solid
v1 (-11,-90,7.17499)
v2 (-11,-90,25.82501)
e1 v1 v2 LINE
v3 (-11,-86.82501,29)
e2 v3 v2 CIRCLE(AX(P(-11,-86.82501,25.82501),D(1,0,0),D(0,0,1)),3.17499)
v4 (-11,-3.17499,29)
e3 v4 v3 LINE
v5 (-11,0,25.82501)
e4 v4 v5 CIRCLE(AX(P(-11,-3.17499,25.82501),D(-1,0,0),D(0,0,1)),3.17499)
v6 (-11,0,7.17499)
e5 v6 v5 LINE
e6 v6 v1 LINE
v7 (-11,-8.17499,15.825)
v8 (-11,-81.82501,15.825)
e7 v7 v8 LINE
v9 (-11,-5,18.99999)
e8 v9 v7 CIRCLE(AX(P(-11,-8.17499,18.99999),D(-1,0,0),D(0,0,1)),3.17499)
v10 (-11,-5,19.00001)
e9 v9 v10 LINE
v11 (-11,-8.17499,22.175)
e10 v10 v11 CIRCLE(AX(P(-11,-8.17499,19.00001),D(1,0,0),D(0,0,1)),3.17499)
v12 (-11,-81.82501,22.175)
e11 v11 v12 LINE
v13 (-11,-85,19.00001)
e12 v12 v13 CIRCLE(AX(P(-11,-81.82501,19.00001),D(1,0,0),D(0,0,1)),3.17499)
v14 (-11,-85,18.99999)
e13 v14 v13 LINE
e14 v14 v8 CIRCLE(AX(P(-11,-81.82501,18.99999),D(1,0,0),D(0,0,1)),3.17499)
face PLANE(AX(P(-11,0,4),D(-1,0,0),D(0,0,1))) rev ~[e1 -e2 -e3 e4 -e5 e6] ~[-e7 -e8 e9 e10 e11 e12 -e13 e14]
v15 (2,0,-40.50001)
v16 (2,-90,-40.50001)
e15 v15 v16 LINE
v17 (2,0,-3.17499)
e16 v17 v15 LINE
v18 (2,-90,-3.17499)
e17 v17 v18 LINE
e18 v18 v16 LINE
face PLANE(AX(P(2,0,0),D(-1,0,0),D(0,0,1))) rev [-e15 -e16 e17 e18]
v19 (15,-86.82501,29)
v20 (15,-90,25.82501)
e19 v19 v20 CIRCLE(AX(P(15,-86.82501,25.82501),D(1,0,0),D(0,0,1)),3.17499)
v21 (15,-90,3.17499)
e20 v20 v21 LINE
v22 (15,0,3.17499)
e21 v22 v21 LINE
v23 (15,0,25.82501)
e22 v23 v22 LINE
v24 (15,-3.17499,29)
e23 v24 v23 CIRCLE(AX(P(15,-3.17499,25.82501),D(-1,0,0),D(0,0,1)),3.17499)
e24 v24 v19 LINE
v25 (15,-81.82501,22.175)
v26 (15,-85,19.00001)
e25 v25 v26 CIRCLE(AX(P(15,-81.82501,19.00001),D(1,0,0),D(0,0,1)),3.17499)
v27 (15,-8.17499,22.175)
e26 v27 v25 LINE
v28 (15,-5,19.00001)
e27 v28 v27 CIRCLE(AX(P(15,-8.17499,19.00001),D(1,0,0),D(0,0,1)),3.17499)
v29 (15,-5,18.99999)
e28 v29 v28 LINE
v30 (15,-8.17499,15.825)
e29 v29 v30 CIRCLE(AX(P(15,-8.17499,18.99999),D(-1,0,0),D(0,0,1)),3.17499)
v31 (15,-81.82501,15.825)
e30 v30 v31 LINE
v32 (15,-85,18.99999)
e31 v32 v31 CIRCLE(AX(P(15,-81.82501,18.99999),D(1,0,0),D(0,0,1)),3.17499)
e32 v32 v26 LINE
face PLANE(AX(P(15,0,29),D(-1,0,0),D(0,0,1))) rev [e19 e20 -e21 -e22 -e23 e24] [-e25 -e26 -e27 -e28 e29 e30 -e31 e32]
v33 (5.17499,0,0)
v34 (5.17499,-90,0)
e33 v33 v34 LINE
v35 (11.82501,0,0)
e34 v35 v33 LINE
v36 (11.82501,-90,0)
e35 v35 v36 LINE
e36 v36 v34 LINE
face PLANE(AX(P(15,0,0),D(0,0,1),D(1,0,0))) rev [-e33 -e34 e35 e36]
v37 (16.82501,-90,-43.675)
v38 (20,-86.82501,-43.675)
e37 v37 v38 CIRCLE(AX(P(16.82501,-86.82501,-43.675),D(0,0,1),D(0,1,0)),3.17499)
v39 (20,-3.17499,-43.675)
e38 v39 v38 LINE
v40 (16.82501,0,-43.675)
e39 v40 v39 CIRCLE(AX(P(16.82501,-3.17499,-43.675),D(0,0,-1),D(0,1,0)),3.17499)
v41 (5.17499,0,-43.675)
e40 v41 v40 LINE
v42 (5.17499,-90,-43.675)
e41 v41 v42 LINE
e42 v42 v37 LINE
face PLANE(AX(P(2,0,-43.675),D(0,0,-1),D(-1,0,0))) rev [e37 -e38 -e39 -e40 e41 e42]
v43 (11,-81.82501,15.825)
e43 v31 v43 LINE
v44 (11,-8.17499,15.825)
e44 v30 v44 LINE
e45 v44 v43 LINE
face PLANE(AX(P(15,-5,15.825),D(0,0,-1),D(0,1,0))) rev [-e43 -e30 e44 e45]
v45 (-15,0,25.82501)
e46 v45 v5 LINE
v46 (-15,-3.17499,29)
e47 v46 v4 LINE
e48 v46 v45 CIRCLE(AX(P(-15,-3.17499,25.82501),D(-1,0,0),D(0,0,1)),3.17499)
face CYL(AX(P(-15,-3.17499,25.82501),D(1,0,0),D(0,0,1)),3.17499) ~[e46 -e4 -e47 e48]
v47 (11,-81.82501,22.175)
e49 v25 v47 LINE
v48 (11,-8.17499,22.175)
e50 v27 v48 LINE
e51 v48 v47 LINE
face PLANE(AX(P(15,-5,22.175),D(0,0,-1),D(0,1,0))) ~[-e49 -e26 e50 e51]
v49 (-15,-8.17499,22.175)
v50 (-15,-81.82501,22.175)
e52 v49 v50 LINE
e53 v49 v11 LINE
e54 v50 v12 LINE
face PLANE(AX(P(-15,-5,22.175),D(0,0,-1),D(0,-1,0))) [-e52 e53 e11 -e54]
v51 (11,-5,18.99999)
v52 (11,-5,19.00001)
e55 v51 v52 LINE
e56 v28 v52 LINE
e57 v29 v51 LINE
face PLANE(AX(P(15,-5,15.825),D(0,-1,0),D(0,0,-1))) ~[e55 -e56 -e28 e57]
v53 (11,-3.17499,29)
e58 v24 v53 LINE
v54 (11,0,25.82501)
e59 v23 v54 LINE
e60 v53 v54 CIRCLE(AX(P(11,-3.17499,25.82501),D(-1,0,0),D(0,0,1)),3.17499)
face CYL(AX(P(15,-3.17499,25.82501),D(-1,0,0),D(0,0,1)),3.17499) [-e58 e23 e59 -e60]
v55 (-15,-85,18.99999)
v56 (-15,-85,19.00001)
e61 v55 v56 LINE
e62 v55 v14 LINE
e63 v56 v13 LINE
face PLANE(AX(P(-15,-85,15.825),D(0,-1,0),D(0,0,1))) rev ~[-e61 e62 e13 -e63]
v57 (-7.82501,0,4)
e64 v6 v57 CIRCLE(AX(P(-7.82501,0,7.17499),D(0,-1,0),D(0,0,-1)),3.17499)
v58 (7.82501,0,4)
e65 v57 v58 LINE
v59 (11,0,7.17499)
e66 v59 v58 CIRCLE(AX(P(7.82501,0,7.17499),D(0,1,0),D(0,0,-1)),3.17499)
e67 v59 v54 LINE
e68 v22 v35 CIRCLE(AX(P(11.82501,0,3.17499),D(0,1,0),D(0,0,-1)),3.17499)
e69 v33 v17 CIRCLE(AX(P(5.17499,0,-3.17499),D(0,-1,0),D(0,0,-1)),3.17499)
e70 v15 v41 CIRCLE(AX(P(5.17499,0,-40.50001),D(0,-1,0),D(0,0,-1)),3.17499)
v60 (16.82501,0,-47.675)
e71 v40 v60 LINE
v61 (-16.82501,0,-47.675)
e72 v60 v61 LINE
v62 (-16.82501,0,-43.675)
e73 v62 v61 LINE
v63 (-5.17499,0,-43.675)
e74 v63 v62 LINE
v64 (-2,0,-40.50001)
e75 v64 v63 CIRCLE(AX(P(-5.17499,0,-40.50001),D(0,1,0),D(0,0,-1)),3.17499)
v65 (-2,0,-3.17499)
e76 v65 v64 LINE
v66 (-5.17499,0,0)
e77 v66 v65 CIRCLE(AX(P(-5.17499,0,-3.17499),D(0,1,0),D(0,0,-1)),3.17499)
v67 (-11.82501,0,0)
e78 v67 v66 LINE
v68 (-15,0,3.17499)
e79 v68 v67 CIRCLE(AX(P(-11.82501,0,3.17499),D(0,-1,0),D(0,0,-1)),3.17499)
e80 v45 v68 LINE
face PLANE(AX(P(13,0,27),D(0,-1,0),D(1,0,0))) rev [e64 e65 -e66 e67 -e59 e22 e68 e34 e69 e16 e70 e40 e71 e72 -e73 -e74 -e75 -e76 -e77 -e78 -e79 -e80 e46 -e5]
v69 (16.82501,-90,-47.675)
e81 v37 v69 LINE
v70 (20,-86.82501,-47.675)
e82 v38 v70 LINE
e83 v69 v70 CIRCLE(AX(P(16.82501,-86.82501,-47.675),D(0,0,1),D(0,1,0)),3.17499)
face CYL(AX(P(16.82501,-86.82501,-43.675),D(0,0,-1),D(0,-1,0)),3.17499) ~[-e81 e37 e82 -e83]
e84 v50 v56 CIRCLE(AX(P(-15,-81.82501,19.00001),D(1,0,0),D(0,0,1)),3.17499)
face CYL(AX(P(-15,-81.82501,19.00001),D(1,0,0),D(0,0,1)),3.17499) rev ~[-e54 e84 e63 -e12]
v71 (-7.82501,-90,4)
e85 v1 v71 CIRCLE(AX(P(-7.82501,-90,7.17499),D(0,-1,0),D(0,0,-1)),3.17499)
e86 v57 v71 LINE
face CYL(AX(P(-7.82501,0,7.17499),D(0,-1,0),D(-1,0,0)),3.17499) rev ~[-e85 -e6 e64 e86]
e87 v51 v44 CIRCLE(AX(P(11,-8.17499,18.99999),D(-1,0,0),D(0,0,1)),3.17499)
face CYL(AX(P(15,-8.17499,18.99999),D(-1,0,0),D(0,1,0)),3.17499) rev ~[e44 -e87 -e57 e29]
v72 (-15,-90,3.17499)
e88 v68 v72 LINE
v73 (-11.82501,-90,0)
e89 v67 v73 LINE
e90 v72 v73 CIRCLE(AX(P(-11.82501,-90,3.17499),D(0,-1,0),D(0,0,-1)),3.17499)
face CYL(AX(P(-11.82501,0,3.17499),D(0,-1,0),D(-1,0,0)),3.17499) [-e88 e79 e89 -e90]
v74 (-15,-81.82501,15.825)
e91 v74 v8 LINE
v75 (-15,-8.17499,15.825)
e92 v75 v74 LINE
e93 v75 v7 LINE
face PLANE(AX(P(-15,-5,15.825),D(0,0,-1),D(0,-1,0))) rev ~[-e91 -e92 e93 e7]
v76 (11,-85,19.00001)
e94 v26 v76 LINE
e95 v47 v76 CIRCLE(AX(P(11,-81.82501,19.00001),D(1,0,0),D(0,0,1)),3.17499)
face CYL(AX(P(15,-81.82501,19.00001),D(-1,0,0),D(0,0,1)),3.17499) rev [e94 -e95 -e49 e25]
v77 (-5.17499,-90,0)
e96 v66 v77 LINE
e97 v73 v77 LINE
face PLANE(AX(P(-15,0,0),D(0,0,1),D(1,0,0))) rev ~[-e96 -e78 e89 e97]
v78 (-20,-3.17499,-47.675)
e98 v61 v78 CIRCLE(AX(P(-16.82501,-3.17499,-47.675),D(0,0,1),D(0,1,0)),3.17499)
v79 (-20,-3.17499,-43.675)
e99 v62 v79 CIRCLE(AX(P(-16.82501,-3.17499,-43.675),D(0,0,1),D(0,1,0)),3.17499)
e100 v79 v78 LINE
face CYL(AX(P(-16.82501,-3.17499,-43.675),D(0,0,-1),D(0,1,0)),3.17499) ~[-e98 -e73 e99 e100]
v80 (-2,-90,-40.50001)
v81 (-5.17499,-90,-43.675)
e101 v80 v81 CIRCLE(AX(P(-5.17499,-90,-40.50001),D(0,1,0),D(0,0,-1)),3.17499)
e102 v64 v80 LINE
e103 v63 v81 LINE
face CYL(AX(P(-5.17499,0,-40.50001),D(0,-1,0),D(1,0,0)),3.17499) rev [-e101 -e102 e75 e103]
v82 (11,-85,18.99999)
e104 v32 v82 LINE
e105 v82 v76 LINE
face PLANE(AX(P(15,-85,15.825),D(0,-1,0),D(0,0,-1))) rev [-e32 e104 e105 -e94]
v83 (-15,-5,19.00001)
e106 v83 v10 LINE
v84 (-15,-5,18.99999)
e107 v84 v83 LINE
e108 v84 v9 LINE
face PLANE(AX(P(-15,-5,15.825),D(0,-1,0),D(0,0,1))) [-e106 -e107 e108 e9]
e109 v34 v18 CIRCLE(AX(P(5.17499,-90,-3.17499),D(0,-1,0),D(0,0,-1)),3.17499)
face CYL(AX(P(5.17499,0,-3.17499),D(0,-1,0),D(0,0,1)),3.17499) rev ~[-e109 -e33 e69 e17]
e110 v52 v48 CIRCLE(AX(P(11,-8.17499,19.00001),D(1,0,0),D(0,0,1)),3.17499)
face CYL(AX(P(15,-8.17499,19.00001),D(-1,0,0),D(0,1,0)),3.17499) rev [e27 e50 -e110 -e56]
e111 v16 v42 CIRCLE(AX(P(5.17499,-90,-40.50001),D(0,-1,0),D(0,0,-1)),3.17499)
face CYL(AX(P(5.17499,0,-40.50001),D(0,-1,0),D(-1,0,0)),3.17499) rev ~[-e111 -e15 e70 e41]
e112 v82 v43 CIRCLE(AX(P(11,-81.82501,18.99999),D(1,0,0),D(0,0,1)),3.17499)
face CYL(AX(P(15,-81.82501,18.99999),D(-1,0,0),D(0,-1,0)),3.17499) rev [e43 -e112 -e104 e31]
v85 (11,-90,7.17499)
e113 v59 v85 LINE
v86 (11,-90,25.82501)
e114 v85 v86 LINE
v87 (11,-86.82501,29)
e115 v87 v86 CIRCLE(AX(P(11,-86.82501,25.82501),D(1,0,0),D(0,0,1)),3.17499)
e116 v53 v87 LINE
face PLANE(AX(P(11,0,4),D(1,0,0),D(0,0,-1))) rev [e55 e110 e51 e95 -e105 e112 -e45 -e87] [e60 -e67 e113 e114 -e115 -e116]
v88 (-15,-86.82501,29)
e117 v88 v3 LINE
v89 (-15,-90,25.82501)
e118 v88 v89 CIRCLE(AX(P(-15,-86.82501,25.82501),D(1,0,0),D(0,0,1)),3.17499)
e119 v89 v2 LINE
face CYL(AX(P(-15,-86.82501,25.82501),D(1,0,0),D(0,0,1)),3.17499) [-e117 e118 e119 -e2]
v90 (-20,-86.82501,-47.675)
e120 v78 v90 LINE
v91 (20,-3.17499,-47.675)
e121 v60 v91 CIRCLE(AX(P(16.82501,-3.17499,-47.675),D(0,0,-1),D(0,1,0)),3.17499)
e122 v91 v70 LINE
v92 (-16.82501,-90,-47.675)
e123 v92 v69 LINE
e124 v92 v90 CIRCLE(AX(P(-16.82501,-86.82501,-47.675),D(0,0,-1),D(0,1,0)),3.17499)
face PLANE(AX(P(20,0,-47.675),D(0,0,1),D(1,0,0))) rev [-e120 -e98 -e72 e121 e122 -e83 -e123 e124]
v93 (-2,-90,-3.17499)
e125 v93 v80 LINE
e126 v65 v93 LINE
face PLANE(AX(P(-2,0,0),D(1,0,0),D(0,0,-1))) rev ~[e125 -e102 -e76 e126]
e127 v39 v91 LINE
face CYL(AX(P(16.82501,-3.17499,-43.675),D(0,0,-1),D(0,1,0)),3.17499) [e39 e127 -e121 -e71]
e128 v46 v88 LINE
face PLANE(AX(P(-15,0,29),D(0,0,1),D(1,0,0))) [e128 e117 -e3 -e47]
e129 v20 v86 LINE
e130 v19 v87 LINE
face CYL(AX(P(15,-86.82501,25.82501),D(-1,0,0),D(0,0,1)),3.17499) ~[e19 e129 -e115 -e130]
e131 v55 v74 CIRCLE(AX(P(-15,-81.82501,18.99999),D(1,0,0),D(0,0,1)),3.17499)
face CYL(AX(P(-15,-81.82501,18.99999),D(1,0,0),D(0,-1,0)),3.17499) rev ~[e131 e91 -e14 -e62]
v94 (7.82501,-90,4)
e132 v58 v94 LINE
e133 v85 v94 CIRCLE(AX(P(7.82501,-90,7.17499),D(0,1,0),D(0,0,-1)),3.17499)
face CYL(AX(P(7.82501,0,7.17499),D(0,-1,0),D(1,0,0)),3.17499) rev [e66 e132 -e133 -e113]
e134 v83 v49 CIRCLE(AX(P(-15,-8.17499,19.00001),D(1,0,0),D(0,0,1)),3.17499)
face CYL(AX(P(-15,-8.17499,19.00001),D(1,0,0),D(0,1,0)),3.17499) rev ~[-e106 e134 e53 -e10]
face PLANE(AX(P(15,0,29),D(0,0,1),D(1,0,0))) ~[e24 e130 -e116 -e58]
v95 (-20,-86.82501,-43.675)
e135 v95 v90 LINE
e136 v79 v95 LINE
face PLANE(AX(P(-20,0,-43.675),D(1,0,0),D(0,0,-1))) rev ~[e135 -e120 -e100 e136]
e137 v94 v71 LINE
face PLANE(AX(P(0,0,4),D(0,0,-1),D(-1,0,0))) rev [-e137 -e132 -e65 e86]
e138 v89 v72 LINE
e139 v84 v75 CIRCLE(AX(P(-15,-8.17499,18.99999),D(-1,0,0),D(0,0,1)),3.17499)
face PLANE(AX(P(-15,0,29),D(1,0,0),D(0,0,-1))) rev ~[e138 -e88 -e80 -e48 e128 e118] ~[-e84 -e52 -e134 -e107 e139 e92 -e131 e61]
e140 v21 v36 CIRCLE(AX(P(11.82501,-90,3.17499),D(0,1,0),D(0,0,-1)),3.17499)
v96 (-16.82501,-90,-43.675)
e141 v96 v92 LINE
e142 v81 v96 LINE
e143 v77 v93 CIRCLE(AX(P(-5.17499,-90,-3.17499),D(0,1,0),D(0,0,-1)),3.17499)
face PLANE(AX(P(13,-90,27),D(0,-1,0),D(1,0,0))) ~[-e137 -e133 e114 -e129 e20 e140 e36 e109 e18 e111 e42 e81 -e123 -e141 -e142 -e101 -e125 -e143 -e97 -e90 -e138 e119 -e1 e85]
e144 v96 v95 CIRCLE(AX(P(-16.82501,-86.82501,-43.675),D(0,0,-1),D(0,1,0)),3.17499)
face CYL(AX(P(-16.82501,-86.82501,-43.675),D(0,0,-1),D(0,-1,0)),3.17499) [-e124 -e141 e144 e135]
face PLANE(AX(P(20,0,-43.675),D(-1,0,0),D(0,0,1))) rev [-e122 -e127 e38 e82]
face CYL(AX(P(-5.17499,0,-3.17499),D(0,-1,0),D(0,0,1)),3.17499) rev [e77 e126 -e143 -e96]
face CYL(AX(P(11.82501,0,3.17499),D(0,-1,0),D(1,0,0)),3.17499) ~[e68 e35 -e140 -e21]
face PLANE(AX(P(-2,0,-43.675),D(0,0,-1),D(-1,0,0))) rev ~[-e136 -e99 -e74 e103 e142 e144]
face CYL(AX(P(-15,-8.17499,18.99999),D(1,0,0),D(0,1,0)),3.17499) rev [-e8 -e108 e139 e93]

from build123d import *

# Parameters (mm, degrees)
F0_W     = 4
F0_H     = 4
F0_H_2   = 6
F1_DEPTH = 90
F2_W     = 80
F2_H     = 6.35
F3_DEPTH = 25
F4_R     = 3.17499


# Not quite as in the source:
# - a fillet or chamfer is up to 0.001 mm smaller than in the source, because OpenCascade refuses the exact size


with BuildPart() as f1:
    # F0 (on Front) → F1 (new body)
    with BuildSketch(Plane.XZ):
        with Locations((-13, 27)):
            Rectangle(F0_W, F0_H)
        with Locations((-13, 22)):
            Rectangle(F0_W, F0_H_2)
        Polygon((-11, 19), (-15, 19), (-15, 0), (-2, 0), (-2, -43.675), (-20, -43.675), (-20, -47.675), (0, -47.675), (0, 0), (0, 4), (-11, 4), align=None)
    extrude(amount=F1_DEPTH)

    # F2 (on face) → F3 (cut)
    with BuildSketch(Plane(origin=(-15, 0, 0), x_dir=(0, -1, 0), z_dir=(-1, 0, 0))):
        with Locations((45, 19)):
            Rectangle(F2_W, F2_H)
    extrude(amount=-F3_DEPTH, mode=Mode.SUBTRACT)

    # F4 (radius 3.175 in the source; OpenCascade refuses exactly that, so slightly less here)
    f4_edges = [f1.edges().sort_by_distance(p)[0] for p in [
        (-13, 0, 29),
        (-13, -90, 29),
        (-11, -45, 4),
        (-15, -45, 0),
        (-20, 0, -45.675),
        (-20, -90, -45.675),
        (-13, -85, 22.175),
        (-13, -85, 15.825),
        (-13, -5, 15.825),
        (-13, -5, 22.175),
        (-2, -45, -43.675),
        (-2, -45, 0),
    ]]
    fillet(f4_edges, radius=F4_R)

    # F5: F1 across plane


with BuildPart() as f1_1:
    add(f1.part)
    add(f1.part.mirror(Plane.YZ))


solid = f1_1.part
